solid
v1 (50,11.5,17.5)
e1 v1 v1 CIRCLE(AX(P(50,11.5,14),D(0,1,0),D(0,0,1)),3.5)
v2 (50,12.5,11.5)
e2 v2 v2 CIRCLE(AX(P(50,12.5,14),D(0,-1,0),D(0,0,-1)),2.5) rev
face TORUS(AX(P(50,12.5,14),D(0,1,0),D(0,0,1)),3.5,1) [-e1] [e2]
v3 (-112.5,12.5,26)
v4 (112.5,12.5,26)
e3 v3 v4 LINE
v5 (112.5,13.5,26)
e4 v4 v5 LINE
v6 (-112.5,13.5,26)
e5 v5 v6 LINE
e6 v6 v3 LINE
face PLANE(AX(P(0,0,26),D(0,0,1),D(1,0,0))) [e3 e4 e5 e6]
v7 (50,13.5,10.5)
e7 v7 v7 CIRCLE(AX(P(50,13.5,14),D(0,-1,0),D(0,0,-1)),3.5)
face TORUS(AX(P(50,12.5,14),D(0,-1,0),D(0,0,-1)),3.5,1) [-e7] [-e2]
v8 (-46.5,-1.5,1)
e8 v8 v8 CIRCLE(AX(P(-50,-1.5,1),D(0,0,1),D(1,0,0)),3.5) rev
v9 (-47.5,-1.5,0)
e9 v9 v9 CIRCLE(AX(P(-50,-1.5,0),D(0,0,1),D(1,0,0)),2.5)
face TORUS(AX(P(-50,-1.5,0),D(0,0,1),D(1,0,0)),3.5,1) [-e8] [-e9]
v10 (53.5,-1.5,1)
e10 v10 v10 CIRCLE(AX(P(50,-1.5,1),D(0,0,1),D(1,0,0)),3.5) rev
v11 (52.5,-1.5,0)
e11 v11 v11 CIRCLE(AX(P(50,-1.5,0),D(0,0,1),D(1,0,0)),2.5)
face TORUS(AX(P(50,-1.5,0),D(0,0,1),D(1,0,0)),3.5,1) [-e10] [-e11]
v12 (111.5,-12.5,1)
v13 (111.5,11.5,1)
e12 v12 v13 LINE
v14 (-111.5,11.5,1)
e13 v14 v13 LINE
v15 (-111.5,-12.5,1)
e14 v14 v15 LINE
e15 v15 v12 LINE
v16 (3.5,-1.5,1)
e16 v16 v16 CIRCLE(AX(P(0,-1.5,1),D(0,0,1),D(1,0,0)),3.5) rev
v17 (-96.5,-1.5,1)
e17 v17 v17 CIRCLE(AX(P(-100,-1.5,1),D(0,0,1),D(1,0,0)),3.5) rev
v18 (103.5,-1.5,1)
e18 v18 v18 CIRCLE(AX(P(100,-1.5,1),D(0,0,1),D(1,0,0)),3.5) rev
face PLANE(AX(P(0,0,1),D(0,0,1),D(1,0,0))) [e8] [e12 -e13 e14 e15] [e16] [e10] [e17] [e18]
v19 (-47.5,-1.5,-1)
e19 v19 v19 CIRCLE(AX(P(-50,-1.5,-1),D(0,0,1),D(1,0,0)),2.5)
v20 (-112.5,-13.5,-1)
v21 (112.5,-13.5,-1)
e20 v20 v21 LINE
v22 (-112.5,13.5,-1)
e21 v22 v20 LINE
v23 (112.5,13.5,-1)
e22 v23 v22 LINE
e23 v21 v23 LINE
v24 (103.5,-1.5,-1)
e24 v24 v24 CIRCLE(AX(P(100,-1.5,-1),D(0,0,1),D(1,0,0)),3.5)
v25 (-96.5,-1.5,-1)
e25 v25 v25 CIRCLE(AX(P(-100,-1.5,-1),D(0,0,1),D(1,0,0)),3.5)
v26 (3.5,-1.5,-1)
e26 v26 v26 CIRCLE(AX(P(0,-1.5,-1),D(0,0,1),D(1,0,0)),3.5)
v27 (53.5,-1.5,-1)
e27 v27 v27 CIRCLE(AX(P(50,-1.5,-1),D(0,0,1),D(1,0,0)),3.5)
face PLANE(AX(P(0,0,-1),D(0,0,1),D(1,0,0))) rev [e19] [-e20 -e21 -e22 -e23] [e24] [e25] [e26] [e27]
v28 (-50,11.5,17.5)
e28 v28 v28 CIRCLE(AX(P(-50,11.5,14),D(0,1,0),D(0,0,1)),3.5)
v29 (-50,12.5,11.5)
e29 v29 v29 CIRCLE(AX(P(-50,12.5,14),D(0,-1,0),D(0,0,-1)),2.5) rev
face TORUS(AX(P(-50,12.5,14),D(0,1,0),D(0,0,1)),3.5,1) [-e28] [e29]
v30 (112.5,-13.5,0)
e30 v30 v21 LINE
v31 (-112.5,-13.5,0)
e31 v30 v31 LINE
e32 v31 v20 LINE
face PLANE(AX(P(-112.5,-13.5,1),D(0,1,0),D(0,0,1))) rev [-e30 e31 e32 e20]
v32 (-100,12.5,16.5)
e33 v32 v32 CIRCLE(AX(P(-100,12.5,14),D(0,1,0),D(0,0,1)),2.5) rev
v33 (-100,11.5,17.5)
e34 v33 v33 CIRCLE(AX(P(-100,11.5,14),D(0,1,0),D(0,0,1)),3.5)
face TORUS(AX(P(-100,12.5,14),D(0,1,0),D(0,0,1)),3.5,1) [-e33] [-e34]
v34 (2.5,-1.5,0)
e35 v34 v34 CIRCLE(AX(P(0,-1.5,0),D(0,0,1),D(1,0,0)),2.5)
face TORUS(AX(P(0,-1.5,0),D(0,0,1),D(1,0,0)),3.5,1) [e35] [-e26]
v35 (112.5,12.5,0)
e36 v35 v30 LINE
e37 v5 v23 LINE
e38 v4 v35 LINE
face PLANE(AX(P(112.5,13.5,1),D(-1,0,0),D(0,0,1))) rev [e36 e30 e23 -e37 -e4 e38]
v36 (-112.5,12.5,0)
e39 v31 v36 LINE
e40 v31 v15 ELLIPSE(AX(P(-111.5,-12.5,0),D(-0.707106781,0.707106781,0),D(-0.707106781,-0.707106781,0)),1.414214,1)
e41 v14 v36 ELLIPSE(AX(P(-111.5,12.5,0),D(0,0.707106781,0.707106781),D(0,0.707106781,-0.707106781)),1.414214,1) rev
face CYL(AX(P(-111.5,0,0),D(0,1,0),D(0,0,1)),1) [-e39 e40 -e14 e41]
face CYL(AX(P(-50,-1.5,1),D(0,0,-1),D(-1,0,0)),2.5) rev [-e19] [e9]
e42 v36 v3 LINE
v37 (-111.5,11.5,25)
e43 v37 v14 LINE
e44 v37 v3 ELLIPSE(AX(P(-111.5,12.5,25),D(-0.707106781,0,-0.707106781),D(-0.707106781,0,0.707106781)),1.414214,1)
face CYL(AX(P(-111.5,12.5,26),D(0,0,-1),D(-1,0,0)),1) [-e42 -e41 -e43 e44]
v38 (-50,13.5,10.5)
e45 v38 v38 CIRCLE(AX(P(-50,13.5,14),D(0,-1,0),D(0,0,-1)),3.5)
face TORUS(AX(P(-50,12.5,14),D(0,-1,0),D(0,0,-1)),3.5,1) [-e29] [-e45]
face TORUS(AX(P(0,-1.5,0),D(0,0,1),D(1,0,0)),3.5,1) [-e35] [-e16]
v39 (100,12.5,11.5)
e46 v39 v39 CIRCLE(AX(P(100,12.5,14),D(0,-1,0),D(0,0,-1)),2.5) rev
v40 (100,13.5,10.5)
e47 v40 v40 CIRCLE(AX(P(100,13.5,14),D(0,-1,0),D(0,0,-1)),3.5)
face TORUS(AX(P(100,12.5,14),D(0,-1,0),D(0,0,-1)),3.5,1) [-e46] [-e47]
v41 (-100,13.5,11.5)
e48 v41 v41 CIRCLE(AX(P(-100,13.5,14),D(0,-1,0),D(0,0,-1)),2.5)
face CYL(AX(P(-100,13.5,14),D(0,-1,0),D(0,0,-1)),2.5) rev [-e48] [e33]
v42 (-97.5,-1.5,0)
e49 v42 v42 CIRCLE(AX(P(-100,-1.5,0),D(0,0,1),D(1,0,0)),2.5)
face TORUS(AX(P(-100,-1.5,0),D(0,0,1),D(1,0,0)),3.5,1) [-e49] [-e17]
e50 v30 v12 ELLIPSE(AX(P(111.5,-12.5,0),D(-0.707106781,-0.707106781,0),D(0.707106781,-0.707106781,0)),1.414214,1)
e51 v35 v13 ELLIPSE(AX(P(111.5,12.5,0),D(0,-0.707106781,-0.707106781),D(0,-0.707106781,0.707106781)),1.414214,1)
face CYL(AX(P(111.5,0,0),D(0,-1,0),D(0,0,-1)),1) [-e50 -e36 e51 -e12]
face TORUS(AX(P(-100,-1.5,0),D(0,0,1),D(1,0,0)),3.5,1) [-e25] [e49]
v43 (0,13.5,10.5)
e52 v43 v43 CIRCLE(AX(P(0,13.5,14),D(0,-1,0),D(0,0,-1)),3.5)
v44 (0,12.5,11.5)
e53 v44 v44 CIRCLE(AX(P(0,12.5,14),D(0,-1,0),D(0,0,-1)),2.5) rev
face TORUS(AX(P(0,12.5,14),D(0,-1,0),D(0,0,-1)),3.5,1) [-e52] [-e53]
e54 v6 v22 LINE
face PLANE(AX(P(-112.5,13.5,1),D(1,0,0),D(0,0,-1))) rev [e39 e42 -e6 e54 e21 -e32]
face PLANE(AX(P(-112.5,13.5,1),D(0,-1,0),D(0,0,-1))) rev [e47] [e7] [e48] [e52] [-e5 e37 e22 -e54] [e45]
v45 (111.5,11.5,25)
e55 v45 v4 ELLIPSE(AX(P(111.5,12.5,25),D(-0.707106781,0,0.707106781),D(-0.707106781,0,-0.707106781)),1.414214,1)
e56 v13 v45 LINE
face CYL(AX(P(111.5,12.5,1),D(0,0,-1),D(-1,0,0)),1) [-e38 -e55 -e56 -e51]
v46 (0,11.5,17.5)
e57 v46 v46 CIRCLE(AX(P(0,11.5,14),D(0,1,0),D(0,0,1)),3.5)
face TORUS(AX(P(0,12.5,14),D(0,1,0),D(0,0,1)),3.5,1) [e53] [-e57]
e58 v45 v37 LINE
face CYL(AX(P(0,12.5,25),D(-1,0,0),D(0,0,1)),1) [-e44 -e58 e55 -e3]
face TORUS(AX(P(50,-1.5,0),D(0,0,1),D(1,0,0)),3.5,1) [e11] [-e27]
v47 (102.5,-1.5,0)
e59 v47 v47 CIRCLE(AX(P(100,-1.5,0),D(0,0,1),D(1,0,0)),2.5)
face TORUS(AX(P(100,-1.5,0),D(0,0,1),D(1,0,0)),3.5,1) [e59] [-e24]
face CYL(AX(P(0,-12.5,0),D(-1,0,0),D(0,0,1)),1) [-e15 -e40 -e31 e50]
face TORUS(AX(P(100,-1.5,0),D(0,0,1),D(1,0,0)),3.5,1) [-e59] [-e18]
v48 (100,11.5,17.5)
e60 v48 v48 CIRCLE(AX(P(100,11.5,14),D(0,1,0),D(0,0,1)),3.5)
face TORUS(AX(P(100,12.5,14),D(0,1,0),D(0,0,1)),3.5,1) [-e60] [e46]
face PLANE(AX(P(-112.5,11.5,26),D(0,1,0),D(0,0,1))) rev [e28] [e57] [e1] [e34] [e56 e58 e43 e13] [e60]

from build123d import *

# Parameters (mm, degrees)
SKETCH_1_W          = 225
SKETCH_1_H          = 27
SKETCH_1_R          = 2.5
EXTRUDE_1_DEPTH     = 1
SKETCH_2_W          = 225
SKETCH_2_H          = 2
EXTRUDE_2_DEPTH     = 25
SKETCH_3_R          = 2.5
CUT_EXTRUDE_1_DEPTH = 119.140805821
FILLET_1_R          = 1


with BuildPart() as part:
    # 草图1 → 凸台-拉伸1 (new, symmetric)
    with BuildSketch(Plane.XY):
        Rectangle(SKETCH_1_W, SKETCH_1_H)
        with Locations((-100, -1.5)):
            Circle(SKETCH_1_R, mode=Mode.SUBTRACT)
        with Locations((-50, -1.5)):
            Circle(SKETCH_1_R, mode=Mode.SUBTRACT)
        with Locations((0, -1.5)):
            Circle(SKETCH_1_R, mode=Mode.SUBTRACT)
        with Locations((50, -1.5)):
            Circle(SKETCH_1_R, mode=Mode.SUBTRACT)
        with Locations((100, -1.5)):
            Circle(SKETCH_1_R, mode=Mode.SUBTRACT)
    extrude(amount=EXTRUDE_1_DEPTH, both=True)

    # 草图2 → 凸台-拉伸2 (add)
    with BuildSketch(Plane.XY.offset(1)):
        with Locations((0, 12.5)):
            Rectangle(SKETCH_2_W, SKETCH_2_H)
    extrude(amount=EXTRUDE_2_DEPTH)

    # 草图3 → 切除-拉伸1 (cut, through all)
    with BuildSketch(Plane.XZ.offset(-11.5)):
        with Locations(Location((-100, 14, 0), (0, 0, 270))):
            Circle(SKETCH_3_R)
        with Locations(Location((-50, 14, 0), (0, 0, 270))):
            Circle(SKETCH_3_R)
        with Locations(Location((0, 14, 0), (0, 0, 270))):
            Circle(SKETCH_3_R)
        with Locations(Location((50, 14, 0), (0, 0, 270))):
            Circle(SKETCH_3_R)
        with Locations(Location((100, 14, 0), (0, 0, 270))):
            Circle(SKETCH_3_R)
    extrude(amount=-CUT_EXTRUDE_1_DEPTH, mode=Mode.SUBTRACT)

    # 圆角1
    fillet_1_edges = [part.edges().sort_by_distance(p)[0] for p in [
        (-102.5, -1.5, -1),
        (-102.5, -1.5, 1),
        (-52.5, -1.5, 1),
        (0, -13.5, 1),
        (-2.5, -1.5, -1),
        (-2.5, -1.5, 1),
        (47.5, -1.5, -1),
        (47.5, -1.5, 1),
        (97.5, -1.5, -1),
        (97.5, -1.5, 1),
        (-112.5, -1, 1),
        (-112.5, 11.5, 13.5),
        (112.5, 11.5, 13.5),
        (0, 11.5, 26),
        (112.5, -1, 1),
        (-100, 11.5, 16.5),
        (-50, 13.5, 16.5),
        (-50, 11.5, 16.5),
        (0, 13.5, 16.5),
        (0, 11.5, 16.5),
        (50, 13.5, 16.5),
        (50, 11.5, 16.5),
        (100, 13.5, 16.5),
        (100, 11.5, 16.5),
    ]]
    fillet(fillet_1_edges, radius=FILLET_1_R - 0.0001)  # a hair under: the kernel refuses the full size


solid = part.part
